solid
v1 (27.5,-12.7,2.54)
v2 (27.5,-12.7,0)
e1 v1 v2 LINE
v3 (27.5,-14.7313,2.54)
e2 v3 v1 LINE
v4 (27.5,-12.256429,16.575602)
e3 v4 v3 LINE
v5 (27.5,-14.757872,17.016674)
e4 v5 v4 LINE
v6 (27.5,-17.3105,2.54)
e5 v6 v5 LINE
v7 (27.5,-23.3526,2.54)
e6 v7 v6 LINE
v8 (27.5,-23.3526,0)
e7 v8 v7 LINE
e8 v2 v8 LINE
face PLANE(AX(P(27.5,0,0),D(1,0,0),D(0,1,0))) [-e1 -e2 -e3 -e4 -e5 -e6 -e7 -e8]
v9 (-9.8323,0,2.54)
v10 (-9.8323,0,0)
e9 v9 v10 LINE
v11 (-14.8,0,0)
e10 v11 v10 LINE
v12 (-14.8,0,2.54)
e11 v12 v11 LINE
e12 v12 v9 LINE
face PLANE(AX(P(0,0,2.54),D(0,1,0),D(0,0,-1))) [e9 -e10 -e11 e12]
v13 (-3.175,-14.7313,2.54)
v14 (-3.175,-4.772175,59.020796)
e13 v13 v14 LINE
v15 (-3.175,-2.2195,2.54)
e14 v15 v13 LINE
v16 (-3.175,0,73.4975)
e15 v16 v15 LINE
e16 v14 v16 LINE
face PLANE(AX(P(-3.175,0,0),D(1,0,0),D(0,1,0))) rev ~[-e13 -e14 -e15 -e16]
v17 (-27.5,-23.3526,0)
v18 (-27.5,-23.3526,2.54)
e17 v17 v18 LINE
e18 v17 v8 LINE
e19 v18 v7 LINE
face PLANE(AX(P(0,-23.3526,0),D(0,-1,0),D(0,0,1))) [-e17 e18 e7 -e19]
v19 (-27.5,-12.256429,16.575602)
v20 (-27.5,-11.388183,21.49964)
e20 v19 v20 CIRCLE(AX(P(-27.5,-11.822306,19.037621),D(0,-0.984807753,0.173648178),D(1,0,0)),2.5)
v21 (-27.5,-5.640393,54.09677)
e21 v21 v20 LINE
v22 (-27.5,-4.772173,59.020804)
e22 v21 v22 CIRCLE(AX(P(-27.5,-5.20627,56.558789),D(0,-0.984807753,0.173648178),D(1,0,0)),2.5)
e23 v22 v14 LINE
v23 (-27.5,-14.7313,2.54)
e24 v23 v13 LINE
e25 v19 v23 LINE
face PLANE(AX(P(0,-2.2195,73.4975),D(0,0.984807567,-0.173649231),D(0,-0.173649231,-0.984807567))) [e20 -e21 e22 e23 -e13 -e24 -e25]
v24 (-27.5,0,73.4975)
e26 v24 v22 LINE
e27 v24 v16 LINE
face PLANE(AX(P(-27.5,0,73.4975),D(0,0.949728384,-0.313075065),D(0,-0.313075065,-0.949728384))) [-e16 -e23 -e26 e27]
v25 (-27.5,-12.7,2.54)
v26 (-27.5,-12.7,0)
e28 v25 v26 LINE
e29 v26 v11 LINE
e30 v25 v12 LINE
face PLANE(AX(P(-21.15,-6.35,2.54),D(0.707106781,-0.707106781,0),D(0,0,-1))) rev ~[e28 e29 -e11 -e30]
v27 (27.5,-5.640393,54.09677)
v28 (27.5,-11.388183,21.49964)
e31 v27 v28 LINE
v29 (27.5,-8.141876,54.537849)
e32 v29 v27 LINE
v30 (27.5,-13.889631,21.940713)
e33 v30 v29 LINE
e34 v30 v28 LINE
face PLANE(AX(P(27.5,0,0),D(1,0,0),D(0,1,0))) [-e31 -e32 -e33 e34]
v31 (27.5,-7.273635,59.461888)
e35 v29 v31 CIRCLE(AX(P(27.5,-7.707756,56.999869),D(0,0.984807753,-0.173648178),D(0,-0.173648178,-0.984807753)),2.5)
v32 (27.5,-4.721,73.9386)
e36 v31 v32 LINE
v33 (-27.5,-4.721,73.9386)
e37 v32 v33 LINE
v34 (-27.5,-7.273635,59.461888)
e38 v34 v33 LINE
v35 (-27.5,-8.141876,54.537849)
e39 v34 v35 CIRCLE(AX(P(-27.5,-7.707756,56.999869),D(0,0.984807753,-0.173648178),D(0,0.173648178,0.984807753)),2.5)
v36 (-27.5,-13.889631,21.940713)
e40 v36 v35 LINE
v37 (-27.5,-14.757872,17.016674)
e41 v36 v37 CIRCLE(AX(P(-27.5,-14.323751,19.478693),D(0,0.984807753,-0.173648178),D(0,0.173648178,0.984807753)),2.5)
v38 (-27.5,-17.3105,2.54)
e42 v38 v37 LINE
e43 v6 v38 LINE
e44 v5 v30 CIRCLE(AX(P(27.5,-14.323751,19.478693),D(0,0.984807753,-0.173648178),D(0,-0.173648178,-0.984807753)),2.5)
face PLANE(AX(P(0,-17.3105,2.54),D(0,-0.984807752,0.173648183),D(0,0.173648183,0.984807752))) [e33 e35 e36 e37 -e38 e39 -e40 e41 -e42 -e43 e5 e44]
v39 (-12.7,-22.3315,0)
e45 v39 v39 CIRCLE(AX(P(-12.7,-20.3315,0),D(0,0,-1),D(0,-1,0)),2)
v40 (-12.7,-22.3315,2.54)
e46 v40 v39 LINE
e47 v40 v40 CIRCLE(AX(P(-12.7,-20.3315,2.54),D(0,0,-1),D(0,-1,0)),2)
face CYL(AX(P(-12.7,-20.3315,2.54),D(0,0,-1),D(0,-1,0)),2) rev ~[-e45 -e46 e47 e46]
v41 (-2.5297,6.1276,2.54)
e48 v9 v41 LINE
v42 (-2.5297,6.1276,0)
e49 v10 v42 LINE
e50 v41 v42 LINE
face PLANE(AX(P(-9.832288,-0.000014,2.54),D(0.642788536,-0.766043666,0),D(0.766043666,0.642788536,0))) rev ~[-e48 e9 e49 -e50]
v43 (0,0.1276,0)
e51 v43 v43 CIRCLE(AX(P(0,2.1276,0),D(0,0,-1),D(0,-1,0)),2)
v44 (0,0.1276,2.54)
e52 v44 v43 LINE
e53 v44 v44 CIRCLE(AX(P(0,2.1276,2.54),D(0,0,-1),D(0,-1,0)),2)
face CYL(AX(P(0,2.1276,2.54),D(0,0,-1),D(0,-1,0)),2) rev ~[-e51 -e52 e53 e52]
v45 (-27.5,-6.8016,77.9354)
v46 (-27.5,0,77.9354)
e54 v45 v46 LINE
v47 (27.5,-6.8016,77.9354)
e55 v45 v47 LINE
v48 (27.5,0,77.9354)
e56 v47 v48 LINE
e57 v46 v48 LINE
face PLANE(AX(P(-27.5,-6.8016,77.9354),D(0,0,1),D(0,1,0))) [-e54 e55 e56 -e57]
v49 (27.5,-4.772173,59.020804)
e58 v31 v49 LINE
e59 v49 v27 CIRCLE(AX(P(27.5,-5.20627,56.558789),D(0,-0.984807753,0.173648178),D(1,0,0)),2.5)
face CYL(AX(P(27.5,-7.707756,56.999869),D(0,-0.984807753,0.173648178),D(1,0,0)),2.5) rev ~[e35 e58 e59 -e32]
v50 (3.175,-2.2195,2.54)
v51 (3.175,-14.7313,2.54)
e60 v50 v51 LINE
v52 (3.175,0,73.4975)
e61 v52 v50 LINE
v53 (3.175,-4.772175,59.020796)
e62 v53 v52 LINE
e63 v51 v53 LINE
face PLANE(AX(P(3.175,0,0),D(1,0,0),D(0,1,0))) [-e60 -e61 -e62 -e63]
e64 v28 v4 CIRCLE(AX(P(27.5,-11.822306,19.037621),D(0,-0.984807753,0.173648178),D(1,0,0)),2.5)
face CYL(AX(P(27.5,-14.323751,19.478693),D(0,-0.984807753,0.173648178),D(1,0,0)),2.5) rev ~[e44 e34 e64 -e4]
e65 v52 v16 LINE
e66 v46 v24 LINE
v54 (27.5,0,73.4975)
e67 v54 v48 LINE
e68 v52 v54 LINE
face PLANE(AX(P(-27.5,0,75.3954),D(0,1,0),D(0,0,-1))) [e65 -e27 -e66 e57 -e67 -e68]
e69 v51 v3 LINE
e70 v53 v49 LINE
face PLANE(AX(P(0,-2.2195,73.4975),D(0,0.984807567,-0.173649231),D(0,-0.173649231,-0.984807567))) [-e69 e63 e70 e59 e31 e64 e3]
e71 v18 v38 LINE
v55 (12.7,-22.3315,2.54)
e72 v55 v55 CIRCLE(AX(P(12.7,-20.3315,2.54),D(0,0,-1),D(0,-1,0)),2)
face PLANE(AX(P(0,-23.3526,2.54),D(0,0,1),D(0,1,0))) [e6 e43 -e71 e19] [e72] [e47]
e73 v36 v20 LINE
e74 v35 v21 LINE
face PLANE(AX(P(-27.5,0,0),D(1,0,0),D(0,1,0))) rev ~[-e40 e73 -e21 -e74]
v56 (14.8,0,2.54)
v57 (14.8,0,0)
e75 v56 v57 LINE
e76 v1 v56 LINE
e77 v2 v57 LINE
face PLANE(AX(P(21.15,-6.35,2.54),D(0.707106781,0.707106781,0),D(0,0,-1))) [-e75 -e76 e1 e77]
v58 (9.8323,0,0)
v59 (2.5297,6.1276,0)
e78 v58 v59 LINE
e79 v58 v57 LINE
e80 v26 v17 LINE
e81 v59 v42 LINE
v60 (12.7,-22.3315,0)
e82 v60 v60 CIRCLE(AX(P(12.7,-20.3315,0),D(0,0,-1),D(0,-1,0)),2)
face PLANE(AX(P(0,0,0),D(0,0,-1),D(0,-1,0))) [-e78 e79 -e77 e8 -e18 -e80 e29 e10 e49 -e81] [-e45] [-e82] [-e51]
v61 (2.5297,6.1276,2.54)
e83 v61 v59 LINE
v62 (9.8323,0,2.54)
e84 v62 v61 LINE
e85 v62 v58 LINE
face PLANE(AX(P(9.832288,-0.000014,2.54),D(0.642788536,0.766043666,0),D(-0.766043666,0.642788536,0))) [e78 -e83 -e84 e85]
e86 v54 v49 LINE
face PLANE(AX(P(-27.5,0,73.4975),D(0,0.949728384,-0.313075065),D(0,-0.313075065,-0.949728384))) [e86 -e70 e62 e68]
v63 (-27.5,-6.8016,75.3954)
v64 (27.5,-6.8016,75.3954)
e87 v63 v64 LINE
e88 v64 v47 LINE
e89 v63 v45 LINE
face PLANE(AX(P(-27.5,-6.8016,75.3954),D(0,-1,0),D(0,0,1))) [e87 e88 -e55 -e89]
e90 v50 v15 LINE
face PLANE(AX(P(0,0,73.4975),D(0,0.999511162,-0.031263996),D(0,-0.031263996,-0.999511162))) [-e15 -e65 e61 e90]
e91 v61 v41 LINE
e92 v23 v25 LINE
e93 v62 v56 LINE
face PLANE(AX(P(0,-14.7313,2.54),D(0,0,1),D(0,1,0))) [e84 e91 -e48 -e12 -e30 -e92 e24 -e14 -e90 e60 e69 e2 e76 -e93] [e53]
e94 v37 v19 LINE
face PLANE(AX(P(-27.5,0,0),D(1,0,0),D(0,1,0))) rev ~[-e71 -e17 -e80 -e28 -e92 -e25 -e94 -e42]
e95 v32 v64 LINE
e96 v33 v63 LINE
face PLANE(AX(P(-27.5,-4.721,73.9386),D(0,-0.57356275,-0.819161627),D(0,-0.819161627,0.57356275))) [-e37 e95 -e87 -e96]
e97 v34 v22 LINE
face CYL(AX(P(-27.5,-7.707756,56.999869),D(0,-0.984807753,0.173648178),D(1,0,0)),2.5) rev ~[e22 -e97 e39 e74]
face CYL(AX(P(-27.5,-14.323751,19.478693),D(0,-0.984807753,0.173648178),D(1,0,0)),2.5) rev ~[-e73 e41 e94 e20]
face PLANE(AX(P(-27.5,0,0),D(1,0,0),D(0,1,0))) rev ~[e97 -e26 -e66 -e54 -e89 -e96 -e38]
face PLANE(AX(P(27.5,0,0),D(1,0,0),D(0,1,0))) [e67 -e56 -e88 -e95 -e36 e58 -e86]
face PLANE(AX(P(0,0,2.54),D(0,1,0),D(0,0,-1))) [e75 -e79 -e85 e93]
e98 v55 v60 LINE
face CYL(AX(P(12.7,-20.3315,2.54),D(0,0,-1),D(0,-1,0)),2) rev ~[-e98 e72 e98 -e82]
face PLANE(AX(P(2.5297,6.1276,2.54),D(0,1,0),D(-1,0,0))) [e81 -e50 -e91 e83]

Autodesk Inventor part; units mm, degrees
ref_plane "YZ Plane" through (0, 0, 0) normal (1, 0, 0) x (0, 1, 0)
ref_plane "XZ Plane" through (0, 0, 0) normal (0, 1, 0) x (-1, 0, 0)
sketch "Sketch2" plane through (0, 0, 0) normal (1, 0, 0) x (0, 1, 0)
  line L0 (-23.6605, 0) -> (-23.6605, 2.54)
  line L1 (-23.6605, 2.54) -> (-17.3105, 2.54)
  line L2 (-17.3105, 2.54) -> (-4.721, 73.9386)
  line L3 (10.5271, 0) -> (9.3929, 0) projected
  line L4 (-4.721, 73.9386) -> (-2.2195, 73.4975)
  line L5 (-4.721, 73.9386) -> (-2.181, 73.9386) construction
  line L6 (-23.3526, 2.54) -> (0, 2.54)
  line L7 (0, 2.54) -> (0, 0)
  line L8 (0, 0) -> (-23.3526, 0)
  line L9 (-23.3526, 0) -> (-23.3526, 2.54)
  line L10 (-2.2195, 73.4975) -> (-14.7313, 2.54)
  point P0 (23.6605, 0)
  point P1 (-4.0951, 0)
  point P2 (-6.6351, 0)
  dimension "d2" = 2.54
  dimension "d3" = 6.35
  dimension "d5" = 100
  dimension "d6" = 2.54
  dimension "d7" = 10
  dimension "d9" = 72.5
extrude "Extrusion1" add sketch "Sketch2" along normal mid plane 55
sketch "Sketch3" plane through (0, 0, 0) normal (1, 0, 0) x (0, 1, 0)
  line L0 (-2.2195, 73.4975) -> (-2.2195, 2.54)
  line L1 (0, 2.54) -> (-14.7313, 2.54) projected
  line L2 (-14.7313, 2.54) -> (-2.2195, 73.4975)
  line L3 (-2.2195, 73.4975) -> (-14.7313, 2.54) projected
  line L4 (-2.2195, 73.4975) -> (0, 73.4975)
  line L5 (0, 73.4975) -> (-2.2195, 2.54)
  point P0 (0, 0)
extrude "Extrusion2" add sketch "Sketch3" along normal mid plane 6.35
sketch "Sketch4" plane through (-27.5, -17.3105, 2.54) normal (0, -0.9848078, 0.1736482) x (1, 0, 0)
  line L0 (2.5, 71.4739) -> (2.5, 1.4739) construction
  line L1 (2.5, 1.4739) -> (52.5, 1.4739) construction
  line L2 (52.5, 1.4739) -> (52.5, 71.4739) construction
  line L3 (52.5, 71.4739) -> (2.5, 71.4739) construction
  line L4 (2.5, 71.4739) -> (52.5, 1.4739) construction
  line L5 (2.5, 1.4739) -> (52.5, 71.4739) construction
  line L6 (55, 0.4479) -> (55, 72.5) projected
  line L7 (2.5, 71.4739) -> (72.5, 71.4739) construction
  line L8 (55, 36.4739) -> (55, 71.4739)
  line L9 (55, 36.4739) -> (55, 1.4739)
  line L10 (55, 72.5) -> (55, 0) projected
  line L11 (55, 55.3) -> (52.5, 55.3)
  line L12 (55, 17.2) -> (52.5, 17.2)
  line L13 (0, 0) -> (0, 72.5) projected
  line L14 (0, 36.4739) -> (0, 71.4739)
  line L15 (0, 36.4739) -> (0, 1.7269)
  line L16 (0, 0.4479) -> (0, 3.0059) projected
  line L17 (0, 17.2) -> (2.5, 17.2)
  line L18 (0, 55.3) -> (2.5, 55.3)
  circle A0 centre (55, 55.3) radius 2.5
  circle A1 centre (55, 17.2) radius 2.5
  circle A2 centre (0, 55.3) radius 2.5
  circle A3 centre (0, 17.2) radius 2.5
  point P0 (27.5, 0.5045)
  point P1 (27.5, 36.4739)
  point P2 (27.5, 36.4739)
  point P3 (27.5, 36.4739)
  point P4 (55, 36.25)
  point P5 (55, 36.25)
  point P6 (0, 52.8)
  point P7 (0, 57.8)
  point P8 (0, 14.7)
  point P9 (0, 19.7)
  point P10 (55, 14.7)
  point P11 (55, 19.7)
  point P12 (55, 52.8)
  point P13 (55, 57.8)
  dimension "d14" = 70
  dimension "d15" = 90
  dimension "d16" = 50
  dimension "d17" = 19.05
  dimension "d18" = 19.05
extrude "Extrusion3" cut sketch "Sketch4" against normal through all contours A1 L12 L6 | L12 A1 L6 | A0 L11 L6 | L11 A0 L6 | L13 L17 A3 | L13 A3 L17 | L13 L18 A2 | L13 A2 L18
sketch "Sketch5" plane through (-27.5, 0, 2.54) normal (0, 0, 1) x (1, 0, 0)
  line L0 (64.0804, -22.4444) -> (30.0297, 6.1276) projected
  line L1 (-9.0804, -22.4444) -> (24.9703, 6.1276) projected
  line L2 (30.0297, 6.1276) -> (24.9703, 6.1276)
  line L3 (0, 0) -> (55, 0) projected
  line L4 (37.3323, 0) -> (17.6677, 0)
  point P0 (27.5, 0)
ref_plane "Work Plane1" through (-49.846, -23.6605, 0) normal (0, 0, 1) x (1, 0, 0)
extrude "Extrusion4" add sketch "Sketch5" against normal up to surface (2.54 mm away)
chamfer "Chamfer1" distance 12.7 angle 45 2 edges at (-27.5, 0, 1.27) (27.5, 0, 1.27)
sketch "Sketch6" plane through (-27.5, 0, 0) normal (-1, 0, 0) x (0, 0, 1)
  line L0 (73.9386, -4.721) -> (73.4975, -2.2195) projected
  line L1 (73.9386, -4.721) -> (75.3954, -6.8016)
  line L2 (73.9386, -4.721) -> (76.4786, -4.721) construction
  line L3 (75.3954, -6.8016) -> (75.3954, 0)
  line L4 (75.3954, 0) -> (73.4975, 0)
  line L5 (73.4975, 0) -> (73.4975, -2.2195)
  line L6 (54.0968, -5.6404) -> (59.0208, -4.7722) projected
  line L7 (73.4975, 0) -> (59.0208, -4.7722)
  line L8 (59.0208, -4.7722) -> (73.4975, -2.2195)
  line L9 (75.3954, -6.8016) -> (77.9354, -6.8016)
  line L10 (77.9354, -6.8016) -> (77.9354, 0)
  line L11 (77.9354, 0) -> (75.3954, 0)
  line L12 (75.3954, 0) -> (75.3954, -6.8016)
  point P0 (0, 0)
  dimension "d26" = 2.54
  dimension "d27" = 55
  dimension "d30" = 2.54
extrude "Extrusion5" add sketch "Sketch6" against normal up to surface (55 mm away)
sketch "Sketch7" plane through (-27.5, -14.7313, 2.54) normal (0, 0, 1) x (1, 0, 0)
  line L0 (12.7, 14.7313) -> (17.6677, 14.7313) construction
  line L1 (37.3323, 14.7313) -> (17.6677, 14.7313) construction
  line L2 (27.5, 14.7313) -> (27.5, 20.8588) construction
  line L3 (30.0297, 20.8588) -> (24.9703, 20.8588) construction
  line L4 (0, -2.5792) -> (55, -2.5792) construction
  line L5 (0, 2.0313) -> (0, -8.6214) construction
  line L6 (55, -2.5792) -> (0, -8.6214) construction
  line L7 (0, -8.6214) -> (0, -2.5792) construction
  line L8 (0, -8.6214) -> (55, -8.6214) construction
  line L9 (55, -8.6214) -> (0, -2.5792) construction
  line L10 (55, -8.6214) -> (55, 2.0313) construction
  line L11 (55, -5.6003) -> (0, -5.6003) construction
  point P0 (27.5, 16.8588)
  point P1 (40.2, -5.6003)
  point P2 (14.8, -5.6003)
  point P3 (27.5, -5.6003)
  point P4 (27.5, -5.6003)
  dimension "d31" = 4
  dimension "d39" = 12.7
  dimension "d40" = 12.7
hole "Hole1" at (0, 2.1276, 2.54) at (12.7, -20.3315, 2.54) at (-12.7, -20.3315, 2.54) direction (0, 0, -1) diameter 4 depth 5.8
properties part number "BreadboardHolderv1"
